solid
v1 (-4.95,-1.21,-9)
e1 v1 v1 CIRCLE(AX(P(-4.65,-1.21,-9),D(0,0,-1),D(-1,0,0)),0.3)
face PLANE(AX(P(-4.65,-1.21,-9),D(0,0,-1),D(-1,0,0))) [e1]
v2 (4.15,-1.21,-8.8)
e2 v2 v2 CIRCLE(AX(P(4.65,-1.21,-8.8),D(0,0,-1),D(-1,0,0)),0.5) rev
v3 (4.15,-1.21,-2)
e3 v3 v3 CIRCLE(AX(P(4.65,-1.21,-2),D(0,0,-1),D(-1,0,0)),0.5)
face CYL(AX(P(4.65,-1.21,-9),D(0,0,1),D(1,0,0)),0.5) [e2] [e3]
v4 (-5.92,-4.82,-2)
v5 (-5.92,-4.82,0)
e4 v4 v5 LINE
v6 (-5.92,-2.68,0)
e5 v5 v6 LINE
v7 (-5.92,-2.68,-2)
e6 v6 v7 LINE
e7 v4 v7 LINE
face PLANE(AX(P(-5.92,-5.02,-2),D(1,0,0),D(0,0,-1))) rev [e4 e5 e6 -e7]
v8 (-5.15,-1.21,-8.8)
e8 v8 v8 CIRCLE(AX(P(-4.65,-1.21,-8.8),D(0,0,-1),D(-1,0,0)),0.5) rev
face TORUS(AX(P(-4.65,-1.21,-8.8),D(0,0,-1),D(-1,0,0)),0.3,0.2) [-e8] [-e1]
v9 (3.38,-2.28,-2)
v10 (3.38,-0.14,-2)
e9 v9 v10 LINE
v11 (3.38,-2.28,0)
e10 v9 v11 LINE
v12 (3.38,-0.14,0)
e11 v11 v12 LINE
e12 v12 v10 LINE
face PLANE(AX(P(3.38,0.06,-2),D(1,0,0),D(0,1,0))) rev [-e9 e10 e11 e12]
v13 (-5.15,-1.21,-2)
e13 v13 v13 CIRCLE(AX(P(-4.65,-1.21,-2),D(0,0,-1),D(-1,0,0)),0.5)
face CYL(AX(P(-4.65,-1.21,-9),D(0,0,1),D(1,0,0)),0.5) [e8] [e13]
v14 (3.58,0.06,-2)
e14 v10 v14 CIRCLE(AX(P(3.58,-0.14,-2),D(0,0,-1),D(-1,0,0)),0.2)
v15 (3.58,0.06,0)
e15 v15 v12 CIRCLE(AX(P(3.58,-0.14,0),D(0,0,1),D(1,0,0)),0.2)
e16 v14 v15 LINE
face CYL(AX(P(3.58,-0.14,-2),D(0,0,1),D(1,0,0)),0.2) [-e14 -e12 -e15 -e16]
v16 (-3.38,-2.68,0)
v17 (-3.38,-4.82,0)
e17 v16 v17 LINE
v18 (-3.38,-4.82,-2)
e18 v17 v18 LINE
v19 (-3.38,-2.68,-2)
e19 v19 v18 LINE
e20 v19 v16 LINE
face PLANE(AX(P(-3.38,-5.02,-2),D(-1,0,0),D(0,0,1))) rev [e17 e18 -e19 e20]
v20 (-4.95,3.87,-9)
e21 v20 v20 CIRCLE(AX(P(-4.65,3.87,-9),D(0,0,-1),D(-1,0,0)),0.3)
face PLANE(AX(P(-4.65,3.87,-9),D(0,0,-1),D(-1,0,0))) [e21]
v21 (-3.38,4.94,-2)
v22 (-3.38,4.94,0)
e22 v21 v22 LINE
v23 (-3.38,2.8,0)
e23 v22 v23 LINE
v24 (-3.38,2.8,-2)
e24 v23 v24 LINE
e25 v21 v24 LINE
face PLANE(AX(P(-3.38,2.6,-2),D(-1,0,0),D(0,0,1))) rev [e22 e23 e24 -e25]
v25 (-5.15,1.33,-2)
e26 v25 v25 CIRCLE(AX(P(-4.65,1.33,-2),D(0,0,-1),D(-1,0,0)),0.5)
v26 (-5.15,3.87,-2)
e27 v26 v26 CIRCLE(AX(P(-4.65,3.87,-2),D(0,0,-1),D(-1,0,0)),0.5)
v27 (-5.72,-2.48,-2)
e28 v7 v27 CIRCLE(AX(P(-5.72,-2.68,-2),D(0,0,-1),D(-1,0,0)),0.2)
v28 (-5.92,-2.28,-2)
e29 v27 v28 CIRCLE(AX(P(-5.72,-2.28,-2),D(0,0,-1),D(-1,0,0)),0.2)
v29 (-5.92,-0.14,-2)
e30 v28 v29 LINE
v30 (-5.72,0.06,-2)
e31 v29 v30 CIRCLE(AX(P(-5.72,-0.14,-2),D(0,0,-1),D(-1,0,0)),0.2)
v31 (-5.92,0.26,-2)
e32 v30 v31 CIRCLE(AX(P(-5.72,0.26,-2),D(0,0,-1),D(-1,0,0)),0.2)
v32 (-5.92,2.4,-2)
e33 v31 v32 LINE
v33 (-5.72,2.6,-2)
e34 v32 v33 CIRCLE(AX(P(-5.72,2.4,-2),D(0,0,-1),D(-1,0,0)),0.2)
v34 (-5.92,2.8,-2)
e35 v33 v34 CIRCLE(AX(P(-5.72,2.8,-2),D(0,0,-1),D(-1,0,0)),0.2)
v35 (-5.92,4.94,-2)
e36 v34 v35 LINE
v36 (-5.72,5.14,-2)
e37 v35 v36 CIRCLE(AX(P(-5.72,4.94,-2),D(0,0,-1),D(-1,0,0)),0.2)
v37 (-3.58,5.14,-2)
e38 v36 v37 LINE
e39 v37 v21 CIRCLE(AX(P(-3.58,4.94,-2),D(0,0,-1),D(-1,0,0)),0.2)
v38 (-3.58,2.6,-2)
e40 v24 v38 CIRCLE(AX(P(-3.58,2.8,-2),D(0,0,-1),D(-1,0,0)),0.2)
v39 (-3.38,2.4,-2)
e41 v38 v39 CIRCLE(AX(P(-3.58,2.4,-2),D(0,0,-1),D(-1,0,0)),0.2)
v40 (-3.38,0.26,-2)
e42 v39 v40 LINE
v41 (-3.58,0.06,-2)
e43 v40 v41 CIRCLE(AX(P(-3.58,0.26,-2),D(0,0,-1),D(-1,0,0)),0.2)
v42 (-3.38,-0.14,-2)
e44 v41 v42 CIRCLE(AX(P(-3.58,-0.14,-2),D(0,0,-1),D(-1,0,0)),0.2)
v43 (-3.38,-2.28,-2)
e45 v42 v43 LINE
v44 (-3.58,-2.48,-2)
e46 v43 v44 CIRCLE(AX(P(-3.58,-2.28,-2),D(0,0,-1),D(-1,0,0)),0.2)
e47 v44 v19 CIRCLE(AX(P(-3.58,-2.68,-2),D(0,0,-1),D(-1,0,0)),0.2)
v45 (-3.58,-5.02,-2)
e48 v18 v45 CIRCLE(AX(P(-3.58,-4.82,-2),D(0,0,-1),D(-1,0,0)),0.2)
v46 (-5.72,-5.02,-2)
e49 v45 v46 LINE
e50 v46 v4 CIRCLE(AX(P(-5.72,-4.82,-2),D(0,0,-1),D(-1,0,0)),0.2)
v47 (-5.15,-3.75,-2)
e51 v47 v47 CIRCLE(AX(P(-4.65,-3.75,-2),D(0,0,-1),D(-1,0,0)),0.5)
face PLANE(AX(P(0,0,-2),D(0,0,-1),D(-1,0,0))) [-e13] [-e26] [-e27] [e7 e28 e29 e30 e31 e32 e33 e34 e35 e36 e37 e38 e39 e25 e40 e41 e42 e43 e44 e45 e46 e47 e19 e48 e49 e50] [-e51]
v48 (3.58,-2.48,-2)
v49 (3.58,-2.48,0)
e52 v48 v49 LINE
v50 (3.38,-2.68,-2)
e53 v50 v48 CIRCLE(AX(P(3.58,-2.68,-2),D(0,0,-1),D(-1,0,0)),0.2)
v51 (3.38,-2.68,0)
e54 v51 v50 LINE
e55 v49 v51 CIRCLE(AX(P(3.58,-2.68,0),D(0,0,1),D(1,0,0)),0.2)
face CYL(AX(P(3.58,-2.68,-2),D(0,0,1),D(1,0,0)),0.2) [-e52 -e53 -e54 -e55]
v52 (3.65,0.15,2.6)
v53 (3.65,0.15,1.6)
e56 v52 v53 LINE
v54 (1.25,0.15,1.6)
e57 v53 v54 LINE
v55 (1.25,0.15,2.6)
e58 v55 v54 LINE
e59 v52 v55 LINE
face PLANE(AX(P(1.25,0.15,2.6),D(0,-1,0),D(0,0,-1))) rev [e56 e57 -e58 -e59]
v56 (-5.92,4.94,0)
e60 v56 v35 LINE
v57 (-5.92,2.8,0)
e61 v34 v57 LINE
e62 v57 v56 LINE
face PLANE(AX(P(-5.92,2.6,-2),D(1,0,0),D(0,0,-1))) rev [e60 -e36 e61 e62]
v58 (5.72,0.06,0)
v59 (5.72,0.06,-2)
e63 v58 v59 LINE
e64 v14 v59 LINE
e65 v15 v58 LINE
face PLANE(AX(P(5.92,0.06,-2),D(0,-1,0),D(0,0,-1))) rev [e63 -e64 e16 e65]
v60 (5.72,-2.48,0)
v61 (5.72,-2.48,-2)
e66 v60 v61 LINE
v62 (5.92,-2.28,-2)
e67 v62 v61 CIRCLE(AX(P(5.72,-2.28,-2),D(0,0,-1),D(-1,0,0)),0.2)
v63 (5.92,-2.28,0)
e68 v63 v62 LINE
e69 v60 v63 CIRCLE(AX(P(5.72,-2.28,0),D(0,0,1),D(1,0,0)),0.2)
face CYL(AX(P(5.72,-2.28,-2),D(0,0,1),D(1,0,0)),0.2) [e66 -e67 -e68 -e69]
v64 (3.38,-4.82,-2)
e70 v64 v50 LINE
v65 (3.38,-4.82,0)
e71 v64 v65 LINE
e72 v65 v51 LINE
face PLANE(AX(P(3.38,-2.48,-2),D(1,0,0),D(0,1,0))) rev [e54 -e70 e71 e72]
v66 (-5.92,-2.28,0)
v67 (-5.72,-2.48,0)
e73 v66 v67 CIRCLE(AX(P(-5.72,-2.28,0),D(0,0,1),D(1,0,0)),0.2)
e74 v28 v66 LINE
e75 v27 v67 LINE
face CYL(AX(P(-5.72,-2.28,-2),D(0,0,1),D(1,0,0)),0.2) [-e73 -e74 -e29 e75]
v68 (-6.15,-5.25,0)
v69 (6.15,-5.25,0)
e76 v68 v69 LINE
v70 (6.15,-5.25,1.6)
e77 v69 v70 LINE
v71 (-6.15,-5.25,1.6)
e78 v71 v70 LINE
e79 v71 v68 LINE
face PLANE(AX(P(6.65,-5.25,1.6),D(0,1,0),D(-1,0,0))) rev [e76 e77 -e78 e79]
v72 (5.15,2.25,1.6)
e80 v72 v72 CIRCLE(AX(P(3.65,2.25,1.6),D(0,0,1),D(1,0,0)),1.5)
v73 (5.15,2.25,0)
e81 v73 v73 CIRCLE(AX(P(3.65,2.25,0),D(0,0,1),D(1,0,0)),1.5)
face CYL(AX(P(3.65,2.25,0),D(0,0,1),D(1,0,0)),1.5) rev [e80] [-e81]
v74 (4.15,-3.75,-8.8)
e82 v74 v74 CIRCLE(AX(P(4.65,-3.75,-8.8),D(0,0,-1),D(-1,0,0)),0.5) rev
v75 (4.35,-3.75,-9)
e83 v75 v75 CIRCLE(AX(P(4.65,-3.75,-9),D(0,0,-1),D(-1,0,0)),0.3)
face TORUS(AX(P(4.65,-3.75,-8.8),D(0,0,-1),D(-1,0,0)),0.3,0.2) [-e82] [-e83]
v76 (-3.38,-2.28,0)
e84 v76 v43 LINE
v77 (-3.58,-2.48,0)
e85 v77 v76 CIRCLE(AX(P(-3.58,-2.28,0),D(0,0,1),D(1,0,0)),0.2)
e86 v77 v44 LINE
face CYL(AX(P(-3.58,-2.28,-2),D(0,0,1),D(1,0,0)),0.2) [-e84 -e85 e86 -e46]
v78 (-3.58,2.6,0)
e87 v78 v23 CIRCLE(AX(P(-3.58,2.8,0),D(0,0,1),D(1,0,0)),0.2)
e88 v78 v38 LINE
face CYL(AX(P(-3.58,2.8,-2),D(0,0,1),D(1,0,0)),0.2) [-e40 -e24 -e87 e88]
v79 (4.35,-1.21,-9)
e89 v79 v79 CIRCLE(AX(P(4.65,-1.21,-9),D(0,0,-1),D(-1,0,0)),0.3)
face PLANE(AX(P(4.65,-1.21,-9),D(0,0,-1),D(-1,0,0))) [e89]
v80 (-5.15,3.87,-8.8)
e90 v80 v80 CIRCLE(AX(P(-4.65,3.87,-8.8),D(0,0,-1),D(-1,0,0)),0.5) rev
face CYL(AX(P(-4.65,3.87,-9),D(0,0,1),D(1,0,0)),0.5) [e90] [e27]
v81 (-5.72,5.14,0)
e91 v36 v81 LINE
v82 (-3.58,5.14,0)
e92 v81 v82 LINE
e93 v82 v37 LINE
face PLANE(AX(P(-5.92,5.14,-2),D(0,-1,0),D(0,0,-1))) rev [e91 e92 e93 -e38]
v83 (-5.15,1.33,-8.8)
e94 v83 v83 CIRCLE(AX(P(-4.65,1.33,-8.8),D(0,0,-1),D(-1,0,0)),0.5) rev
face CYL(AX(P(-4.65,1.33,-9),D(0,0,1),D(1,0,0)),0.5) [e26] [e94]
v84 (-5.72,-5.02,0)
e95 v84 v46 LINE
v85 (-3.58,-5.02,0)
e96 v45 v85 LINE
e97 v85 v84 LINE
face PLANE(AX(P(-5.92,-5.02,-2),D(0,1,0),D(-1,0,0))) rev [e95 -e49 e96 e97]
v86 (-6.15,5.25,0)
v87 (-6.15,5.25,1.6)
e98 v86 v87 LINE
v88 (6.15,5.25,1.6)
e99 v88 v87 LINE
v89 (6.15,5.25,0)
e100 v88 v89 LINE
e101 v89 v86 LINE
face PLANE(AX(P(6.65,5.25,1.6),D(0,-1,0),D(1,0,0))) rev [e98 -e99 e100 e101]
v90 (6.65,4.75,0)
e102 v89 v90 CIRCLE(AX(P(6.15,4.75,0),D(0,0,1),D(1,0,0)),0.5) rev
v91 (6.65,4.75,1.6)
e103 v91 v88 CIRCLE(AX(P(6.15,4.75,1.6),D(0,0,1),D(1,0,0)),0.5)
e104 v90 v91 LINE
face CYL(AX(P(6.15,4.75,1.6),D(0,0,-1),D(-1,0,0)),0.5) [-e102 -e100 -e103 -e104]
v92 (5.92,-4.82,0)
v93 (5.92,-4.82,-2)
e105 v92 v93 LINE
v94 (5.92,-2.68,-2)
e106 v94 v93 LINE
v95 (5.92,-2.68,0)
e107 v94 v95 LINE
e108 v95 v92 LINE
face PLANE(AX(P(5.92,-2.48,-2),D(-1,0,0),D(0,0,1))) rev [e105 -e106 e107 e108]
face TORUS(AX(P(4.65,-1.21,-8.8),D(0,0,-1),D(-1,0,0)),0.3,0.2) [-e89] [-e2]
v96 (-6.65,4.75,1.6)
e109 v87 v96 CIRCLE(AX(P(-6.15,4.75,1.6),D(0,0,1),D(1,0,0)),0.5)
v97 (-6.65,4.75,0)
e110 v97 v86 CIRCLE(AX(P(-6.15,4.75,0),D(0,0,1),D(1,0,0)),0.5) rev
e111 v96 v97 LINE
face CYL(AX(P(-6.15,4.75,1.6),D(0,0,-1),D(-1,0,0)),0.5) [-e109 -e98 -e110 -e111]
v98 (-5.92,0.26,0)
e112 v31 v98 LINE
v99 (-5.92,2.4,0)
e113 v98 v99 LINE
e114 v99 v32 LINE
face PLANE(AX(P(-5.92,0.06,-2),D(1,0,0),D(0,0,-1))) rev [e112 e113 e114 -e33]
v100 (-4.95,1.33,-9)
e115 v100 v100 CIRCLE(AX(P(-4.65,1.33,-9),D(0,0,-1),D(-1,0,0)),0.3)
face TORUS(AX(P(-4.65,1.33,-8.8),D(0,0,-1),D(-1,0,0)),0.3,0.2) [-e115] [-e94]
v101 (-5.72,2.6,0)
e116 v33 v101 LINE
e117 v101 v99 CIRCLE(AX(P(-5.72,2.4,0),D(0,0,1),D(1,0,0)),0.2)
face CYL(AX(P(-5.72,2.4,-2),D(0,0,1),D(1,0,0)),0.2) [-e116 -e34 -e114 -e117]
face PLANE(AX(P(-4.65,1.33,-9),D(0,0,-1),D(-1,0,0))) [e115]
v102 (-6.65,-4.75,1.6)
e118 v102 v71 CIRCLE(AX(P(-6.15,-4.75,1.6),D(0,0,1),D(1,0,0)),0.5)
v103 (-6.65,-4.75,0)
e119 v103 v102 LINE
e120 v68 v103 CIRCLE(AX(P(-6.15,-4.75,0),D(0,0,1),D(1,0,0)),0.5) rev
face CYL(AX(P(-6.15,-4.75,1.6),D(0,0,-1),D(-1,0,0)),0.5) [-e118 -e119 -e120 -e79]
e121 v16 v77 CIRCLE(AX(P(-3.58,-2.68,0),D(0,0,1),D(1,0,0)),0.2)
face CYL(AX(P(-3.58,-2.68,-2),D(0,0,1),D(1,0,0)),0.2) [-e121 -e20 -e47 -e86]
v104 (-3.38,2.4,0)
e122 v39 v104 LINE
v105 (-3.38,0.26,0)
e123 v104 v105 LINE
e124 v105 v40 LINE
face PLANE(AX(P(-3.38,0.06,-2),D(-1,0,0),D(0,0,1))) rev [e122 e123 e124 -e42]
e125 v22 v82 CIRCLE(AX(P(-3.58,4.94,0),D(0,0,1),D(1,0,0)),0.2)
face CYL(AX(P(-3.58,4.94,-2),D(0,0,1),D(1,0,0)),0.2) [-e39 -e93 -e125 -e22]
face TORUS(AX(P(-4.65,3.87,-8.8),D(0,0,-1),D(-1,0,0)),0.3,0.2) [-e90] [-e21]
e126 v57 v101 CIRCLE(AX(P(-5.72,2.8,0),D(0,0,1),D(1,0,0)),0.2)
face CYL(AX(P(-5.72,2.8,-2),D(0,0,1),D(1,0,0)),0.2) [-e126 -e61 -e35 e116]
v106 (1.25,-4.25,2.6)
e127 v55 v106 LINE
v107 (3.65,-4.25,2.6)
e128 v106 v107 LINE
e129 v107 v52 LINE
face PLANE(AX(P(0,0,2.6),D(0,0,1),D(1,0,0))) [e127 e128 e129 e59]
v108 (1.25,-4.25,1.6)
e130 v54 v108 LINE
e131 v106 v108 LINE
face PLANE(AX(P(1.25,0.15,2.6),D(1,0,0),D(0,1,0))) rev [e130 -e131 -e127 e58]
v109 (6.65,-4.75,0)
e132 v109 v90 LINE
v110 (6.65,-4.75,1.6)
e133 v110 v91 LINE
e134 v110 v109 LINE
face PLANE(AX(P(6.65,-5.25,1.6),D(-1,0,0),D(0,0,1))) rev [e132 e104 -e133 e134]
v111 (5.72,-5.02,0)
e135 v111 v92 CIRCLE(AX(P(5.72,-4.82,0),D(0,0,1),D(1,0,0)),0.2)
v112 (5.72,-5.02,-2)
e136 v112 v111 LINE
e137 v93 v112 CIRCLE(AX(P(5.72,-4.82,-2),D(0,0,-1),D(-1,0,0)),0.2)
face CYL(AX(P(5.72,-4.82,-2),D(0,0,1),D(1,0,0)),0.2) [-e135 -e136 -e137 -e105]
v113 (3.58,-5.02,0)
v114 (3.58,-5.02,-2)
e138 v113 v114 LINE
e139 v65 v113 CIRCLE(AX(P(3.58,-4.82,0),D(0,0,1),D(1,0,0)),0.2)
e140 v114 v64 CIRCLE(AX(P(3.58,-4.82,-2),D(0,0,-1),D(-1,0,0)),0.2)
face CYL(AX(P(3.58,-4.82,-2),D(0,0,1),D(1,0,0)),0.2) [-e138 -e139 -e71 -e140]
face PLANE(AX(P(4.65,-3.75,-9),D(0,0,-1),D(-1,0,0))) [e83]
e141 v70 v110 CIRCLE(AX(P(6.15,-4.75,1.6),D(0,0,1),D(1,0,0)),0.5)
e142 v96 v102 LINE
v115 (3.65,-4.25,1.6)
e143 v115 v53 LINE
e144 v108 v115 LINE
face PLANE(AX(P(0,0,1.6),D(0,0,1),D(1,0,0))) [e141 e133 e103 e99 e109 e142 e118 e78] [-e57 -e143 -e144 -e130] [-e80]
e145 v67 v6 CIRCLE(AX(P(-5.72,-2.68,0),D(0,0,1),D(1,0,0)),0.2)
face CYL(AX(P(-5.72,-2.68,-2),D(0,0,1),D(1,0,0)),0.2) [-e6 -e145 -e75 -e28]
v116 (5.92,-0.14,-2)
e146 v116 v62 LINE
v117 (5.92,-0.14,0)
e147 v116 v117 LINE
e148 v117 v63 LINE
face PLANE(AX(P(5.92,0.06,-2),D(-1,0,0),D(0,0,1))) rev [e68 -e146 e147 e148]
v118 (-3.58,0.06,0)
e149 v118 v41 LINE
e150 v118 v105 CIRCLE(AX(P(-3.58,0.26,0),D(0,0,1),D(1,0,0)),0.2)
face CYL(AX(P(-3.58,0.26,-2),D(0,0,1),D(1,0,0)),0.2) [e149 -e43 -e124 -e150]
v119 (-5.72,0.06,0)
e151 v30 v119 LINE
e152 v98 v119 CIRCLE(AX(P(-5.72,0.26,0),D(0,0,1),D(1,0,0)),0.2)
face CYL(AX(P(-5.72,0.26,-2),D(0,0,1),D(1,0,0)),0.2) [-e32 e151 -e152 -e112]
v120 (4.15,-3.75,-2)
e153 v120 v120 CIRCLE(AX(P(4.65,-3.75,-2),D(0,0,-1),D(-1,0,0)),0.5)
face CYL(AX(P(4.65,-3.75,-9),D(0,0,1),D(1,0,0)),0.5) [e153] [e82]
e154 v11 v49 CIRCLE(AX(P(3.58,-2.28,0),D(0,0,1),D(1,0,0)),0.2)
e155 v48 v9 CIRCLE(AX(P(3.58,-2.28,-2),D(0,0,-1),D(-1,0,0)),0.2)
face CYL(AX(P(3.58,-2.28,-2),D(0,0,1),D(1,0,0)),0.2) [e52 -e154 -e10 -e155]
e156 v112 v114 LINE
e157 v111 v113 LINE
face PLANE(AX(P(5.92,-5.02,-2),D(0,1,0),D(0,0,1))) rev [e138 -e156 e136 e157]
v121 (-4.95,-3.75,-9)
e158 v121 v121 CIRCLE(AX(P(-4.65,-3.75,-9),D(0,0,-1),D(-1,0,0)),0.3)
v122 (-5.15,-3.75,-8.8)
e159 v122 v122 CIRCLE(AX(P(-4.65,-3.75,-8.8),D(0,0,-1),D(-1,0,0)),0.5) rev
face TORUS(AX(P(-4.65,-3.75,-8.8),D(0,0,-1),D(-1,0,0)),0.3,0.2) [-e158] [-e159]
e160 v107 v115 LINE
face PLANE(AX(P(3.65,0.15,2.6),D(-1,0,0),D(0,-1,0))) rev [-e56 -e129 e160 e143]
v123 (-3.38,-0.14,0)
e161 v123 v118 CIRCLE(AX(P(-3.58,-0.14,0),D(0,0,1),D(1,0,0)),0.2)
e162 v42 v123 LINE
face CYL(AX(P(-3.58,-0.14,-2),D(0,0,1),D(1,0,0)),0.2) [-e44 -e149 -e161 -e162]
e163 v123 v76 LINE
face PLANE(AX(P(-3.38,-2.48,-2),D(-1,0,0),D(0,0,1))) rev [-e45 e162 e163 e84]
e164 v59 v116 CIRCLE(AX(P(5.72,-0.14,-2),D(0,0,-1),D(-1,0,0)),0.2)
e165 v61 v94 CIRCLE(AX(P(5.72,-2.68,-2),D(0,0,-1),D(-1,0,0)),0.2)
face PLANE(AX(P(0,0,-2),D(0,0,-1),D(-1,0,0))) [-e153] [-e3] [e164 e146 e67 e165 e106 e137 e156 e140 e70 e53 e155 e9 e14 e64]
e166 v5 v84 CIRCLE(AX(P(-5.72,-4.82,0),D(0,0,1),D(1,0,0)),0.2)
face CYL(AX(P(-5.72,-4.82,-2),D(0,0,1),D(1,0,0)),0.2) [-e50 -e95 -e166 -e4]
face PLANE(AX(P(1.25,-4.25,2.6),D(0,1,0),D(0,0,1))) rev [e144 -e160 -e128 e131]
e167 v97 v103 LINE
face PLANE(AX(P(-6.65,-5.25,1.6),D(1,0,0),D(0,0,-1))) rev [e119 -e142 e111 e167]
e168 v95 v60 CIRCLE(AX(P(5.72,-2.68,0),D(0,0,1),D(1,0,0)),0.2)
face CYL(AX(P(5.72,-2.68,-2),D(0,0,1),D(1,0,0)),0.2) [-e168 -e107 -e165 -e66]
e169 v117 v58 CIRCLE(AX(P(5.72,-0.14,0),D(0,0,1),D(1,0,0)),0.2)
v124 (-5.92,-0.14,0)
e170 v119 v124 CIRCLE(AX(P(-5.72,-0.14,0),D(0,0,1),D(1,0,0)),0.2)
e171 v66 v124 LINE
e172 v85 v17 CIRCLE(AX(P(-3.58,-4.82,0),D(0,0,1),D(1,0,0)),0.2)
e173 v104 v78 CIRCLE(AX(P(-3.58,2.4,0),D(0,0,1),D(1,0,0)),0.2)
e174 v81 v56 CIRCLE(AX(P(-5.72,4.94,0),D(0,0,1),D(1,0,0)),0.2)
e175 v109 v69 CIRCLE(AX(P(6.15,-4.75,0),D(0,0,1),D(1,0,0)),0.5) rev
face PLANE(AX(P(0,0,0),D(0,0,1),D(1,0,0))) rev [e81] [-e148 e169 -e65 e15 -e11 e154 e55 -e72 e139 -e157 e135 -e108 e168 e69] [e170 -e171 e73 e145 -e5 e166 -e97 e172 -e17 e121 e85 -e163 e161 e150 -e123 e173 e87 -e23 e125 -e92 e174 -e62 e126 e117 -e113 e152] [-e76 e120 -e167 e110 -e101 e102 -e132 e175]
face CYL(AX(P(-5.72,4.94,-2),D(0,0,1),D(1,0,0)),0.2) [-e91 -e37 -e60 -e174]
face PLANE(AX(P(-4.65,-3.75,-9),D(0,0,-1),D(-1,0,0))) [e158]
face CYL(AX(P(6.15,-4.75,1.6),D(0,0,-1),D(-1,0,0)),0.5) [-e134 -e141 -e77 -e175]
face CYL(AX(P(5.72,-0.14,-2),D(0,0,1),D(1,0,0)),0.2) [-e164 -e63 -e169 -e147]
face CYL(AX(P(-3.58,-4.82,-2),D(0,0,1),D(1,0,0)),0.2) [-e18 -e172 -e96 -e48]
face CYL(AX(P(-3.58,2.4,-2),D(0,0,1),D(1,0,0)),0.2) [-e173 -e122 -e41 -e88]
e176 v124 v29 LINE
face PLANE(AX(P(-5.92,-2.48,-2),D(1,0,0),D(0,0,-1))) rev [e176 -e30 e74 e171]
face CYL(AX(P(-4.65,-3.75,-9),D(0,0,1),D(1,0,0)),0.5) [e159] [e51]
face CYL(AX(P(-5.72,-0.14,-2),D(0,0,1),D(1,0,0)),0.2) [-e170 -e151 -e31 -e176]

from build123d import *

# Parameters (mm, degrees)
SKETCH1_W           = 13.3
SKETCH1_H           = 10.5
BOSS_EXTRUDE1_DEPTH = 1.6
SKETCH2_R           = 1.5
CUT_EXTRUDE1_DEPTH  = 1.6
SKETCH3_W           = 2.4
SKETCH3_H           = 4.4
BOSS_EXTRUDE2_DEPTH = 1
FILLET1_R           = 0.5
SKETCH4_W           = 2.54
SKETCH4_H           = 2.54
BOSS_EXTRUDE3_DEPTH = 2
SKETCH5_R           = 0.5
BOSS_EXTRUDE4_DEPTH = 7
FILLET2_R           = 0.2
LPATTERN1_START     = -2
LPATTERN1_DEPTH     = 2
SKETCH6_W           = 2.54
SKETCH6_H           = 2.54
BOSS_EXTRUDE5_DEPTH = 2
SKETCH7_R           = 0.5
BOSS_EXTRUDE6_DEPTH = 7
FILLET3_R           = 0.2
LPATTERN2_START     = -2
LPATTERN2_DEPTH     = 2


# Read off the part's stored shape, not the designer's step: LPattern1, LPattern2
with BuildPart() as part:
    # Sketch1 → Boss-Extrude1 (new body)
    with BuildSketch(Plane.XY):
        Rectangle(SKETCH1_W, SKETCH1_H)
    extrude(amount=BOSS_EXTRUDE1_DEPTH)

    # Sketch2 → Cut-Extrude1 (cut)
    with BuildSketch(Plane.XY.offset(1.6)):
        with Locations((3.65, 2.25)):
            Circle(SKETCH2_R)
    extrude(amount=-CUT_EXTRUDE1_DEPTH, mode=Mode.SUBTRACT)

    # Sketch3 → Boss-Extrude2 (add)
    with BuildSketch(Plane.XY.offset(1.6)):
        with Locations((2.45, -2.05)):
            Rectangle(SKETCH3_W, SKETCH3_H)
    extrude(amount=BOSS_EXTRUDE2_DEPTH)

    # Fillet1
    fillet1_edges = [part.edges().sort_by_distance(p)[0] for p in [
        (-6.65, 5.25, 0.8),
        (6.65, 5.25, 0.8),
        (6.65, -5.25, 0.8),
        (-6.65, -5.25, 0.8),
    ]]
    fillet(fillet1_edges, radius=FILLET1_R)

    # Sketch4 → Boss-Extrude3 (add)
    with BuildSketch(Plane(origin=(0, 0, 0), x_dir=(-1, 0, 0), z_dir=(0, 0, -1))):
        with Locations((4.65, -3.75)):
            Rectangle(SKETCH4_W, SKETCH4_H)
    extrude(amount=BOSS_EXTRUDE3_DEPTH)

    # Sketch5 → Boss-Extrude4 (add)
    with BuildSketch(Plane(origin=(0, 0, -2), x_dir=(-1, 0, 0), z_dir=(0, 0, -1))):
        with Locations((4.65, -3.75)):
            Circle(SKETCH5_R)
    extrude(amount=BOSS_EXTRUDE4_DEPTH)

    # Fillet2
    fillet2_edges = [part.edges().sort_by_distance(p)[0] for p in [
        (-3.38, -2.48, -1),
        (-3.38, -5.02, -1),
        (-5.92, -5.02, -1),
        (-5.92, -2.48, -1),
        (-4.15, -3.75, -9),
    ]]
    fillet(fillet2_edges, radius=FILLET2_R)

    # LPattern1 outline → LPattern1 (add)
    with BuildSketch(Plane.XY.offset(LPATTERN1_START)):
        with BuildLine():
            Line((-3.38, -2.28), (-3.38, -0.14))
            ThreePointArc((-3.38, -0.14), (-3.438578644, 0.001421356), (-3.58, 0.06))
            ThreePointArc((-3.58, 0.06), (-3.438578644, 0.118578644), (-3.38, 0.26))
            Line((-3.38, 0.26), (-3.38, 2.4))
            ThreePointArc((-3.38, 2.4), (-3.438578644, 2.541421356), (-3.58, 2.6))
            ThreePointArc((-3.58, 2.6), (-3.438578644, 2.658578644), (-3.38, 2.8))
            Line((-3.38, 2.8), (-3.38, 4.94))
            ThreePointArc((-3.38, 4.94), (-3.438578644, 5.081421356), (-3.58, 5.14))
            Line((-3.58, 5.14), (-5.72, 5.14))
            ThreePointArc((-5.72, 5.14), (-5.861421356, 5.081421356), (-5.92, 4.94))
            Line((-5.92, 4.94), (-5.92, 2.8))
            ThreePointArc((-5.92, 2.8), (-5.861421356, 2.658578644), (-5.72, 2.6))
            ThreePointArc((-5.72, 2.6), (-5.861421356, 2.541421356), (-5.92, 2.4))
            Line((-5.92, 2.4), (-5.92, 0.26))
            ThreePointArc((-5.92, 0.26), (-5.861421356, 0.118578644), (-5.72, 0.06))
            ThreePointArc((-5.72, 0.06), (-5.861421356, 0.001421356), (-5.92, -0.14))
            Line((-5.92, -0.14), (-5.92, -2.28))
            ThreePointArc((-5.92, -2.28), (-5.861421356, -2.421421356), (-5.72, -2.48))
            Line((-5.72, -2.48), (-3.58, -2.48))
            ThreePointArc((-3.58, -2.48), (-3.438578644, -2.421421356), (-3.38, -2.28))
        make_face()
    extrude(amount=LPATTERN1_DEPTH)

    # LPattern1 2 outline → LPattern1 2 (revolve)
    with BuildSketch(Plane(origin=(-4.65, -1.21, 0), x_dir=(1, 0, 0), z_dir=(0, -1, 0))):
        with BuildLine():
            Line((0, -2), (0, -9))
            Line((0, -9), (0.3, -9))
            ThreePointArc((0.3, -9), (0.441421356, -8.941421356), (0.5, -8.8))
            Line((0.5, -8.8), (0.5, -2))
            Line((0.5, -2), (0, -2))
        make_face()
    revolve(axis=Axis((-4.65, -1.21, 0), (0, 0, 1)))

    # LPattern1 3 outline → LPattern1 3 (revolve)
    with BuildSketch(Plane(origin=(-4.65, 1.33, 0), x_dir=(1, 0, 0), z_dir=(0, -1, 0))):
        with BuildLine():
            Line((0, -2), (0, -9))
            Line((0, -9), (0.3, -9))
            ThreePointArc((0.3, -9), (0.441421356, -8.941421356), (0.5, -8.8))
            Line((0.5, -8.8), (0.5, -2))
            Line((0.5, -2), (0, -2))
        make_face()
    revolve(axis=Axis((-4.65, 1.33, 0), (0, 0, 1)))

    # LPattern1 4 outline → LPattern1 4 (revolve)
    with BuildSketch(Plane(origin=(-4.65, 3.87, 0), x_dir=(1, 0, 0), z_dir=(0, -1, 0))):
        with BuildLine():
            Line((0, -2), (0, -9))
            Line((0, -9), (0.3, -9))
            ThreePointArc((0.3, -9), (0.441421356, -8.941421356), (0.5, -8.8))
            Line((0.5, -8.8), (0.5, -2))
            Line((0.5, -2), (0, -2))
        make_face()
    revolve(axis=Axis((-4.65, 3.87, 0), (0, 0, 1)))

    # Sketch6 → Boss-Extrude5 (add)
    with BuildSketch(Plane(origin=(0, 0, 0), x_dir=(-1, 0, 0), z_dir=(0, 0, -1))):
        with Locations((-4.65, -3.75)):
            Rectangle(SKETCH6_W, SKETCH6_H)
    extrude(amount=BOSS_EXTRUDE5_DEPTH)

    # Sketch7 → Boss-Extrude6 (add)
    with BuildSketch(Plane(origin=(0, 0, -2), x_dir=(-1, 0, 0), z_dir=(0, 0, -1))):
        with Locations((-4.65, -3.75)):
            Circle(SKETCH7_R)
    extrude(amount=BOSS_EXTRUDE6_DEPTH)

    # Fillet3
    fillet3_edges = [part.edges().sort_by_distance(p)[0] for p in [
        (3.38, -5.02, -1),
        (3.38, -2.48, -1),
        (5.92, -2.48, -1),
        (5.92, -5.02, -1),
        (5.15, -3.75, -9),
    ]]
    fillet(fillet3_edges, radius=FILLET3_R)

    # LPattern2 outline → LPattern2 (add)
    with BuildSketch(Plane.XY.offset(LPATTERN2_START)):
        with BuildLine():
            Line((3.38, -0.14), (3.38, -2.28))
            ThreePointArc((3.38, -2.28), (3.438578644, -2.421421356), (3.58, -2.48))
            Line((3.58, -2.48), (5.72, -2.48))
            ThreePointArc((5.72, -2.48), (5.861421356, -2.421421356), (5.92, -2.28))
            Line((5.92, -2.28), (5.92, -0.14))
            ThreePointArc((5.92, -0.14), (5.861421356, 0.001421356), (5.72, 0.06))
            Line((5.72, 0.06), (3.58, 0.06))
            ThreePointArc((3.58, 0.06), (3.438578644, 0.001421356), (3.38, -0.14))
        make_face()
    extrude(amount=LPATTERN2_DEPTH)

    # LPattern2 2 outline → LPattern2 2 (revolve)
    with BuildSketch(Plane(origin=(4.65, -1.21, 0), x_dir=(1, 0, 0), z_dir=(0, -1, 0))):
        with BuildLine():
            Line((0, -2), (0, -9))
            Line((0, -9), (0.3, -9))
            ThreePointArc((0.3, -9), (0.441421356, -8.941421356), (0.5, -8.8))
            Line((0.5, -8.8), (0.5, -2))
            Line((0.5, -2), (0, -2))
        make_face()
    revolve(axis=Axis((4.65, -1.21, 0), (0, 0, 1)))


solid = part.part
